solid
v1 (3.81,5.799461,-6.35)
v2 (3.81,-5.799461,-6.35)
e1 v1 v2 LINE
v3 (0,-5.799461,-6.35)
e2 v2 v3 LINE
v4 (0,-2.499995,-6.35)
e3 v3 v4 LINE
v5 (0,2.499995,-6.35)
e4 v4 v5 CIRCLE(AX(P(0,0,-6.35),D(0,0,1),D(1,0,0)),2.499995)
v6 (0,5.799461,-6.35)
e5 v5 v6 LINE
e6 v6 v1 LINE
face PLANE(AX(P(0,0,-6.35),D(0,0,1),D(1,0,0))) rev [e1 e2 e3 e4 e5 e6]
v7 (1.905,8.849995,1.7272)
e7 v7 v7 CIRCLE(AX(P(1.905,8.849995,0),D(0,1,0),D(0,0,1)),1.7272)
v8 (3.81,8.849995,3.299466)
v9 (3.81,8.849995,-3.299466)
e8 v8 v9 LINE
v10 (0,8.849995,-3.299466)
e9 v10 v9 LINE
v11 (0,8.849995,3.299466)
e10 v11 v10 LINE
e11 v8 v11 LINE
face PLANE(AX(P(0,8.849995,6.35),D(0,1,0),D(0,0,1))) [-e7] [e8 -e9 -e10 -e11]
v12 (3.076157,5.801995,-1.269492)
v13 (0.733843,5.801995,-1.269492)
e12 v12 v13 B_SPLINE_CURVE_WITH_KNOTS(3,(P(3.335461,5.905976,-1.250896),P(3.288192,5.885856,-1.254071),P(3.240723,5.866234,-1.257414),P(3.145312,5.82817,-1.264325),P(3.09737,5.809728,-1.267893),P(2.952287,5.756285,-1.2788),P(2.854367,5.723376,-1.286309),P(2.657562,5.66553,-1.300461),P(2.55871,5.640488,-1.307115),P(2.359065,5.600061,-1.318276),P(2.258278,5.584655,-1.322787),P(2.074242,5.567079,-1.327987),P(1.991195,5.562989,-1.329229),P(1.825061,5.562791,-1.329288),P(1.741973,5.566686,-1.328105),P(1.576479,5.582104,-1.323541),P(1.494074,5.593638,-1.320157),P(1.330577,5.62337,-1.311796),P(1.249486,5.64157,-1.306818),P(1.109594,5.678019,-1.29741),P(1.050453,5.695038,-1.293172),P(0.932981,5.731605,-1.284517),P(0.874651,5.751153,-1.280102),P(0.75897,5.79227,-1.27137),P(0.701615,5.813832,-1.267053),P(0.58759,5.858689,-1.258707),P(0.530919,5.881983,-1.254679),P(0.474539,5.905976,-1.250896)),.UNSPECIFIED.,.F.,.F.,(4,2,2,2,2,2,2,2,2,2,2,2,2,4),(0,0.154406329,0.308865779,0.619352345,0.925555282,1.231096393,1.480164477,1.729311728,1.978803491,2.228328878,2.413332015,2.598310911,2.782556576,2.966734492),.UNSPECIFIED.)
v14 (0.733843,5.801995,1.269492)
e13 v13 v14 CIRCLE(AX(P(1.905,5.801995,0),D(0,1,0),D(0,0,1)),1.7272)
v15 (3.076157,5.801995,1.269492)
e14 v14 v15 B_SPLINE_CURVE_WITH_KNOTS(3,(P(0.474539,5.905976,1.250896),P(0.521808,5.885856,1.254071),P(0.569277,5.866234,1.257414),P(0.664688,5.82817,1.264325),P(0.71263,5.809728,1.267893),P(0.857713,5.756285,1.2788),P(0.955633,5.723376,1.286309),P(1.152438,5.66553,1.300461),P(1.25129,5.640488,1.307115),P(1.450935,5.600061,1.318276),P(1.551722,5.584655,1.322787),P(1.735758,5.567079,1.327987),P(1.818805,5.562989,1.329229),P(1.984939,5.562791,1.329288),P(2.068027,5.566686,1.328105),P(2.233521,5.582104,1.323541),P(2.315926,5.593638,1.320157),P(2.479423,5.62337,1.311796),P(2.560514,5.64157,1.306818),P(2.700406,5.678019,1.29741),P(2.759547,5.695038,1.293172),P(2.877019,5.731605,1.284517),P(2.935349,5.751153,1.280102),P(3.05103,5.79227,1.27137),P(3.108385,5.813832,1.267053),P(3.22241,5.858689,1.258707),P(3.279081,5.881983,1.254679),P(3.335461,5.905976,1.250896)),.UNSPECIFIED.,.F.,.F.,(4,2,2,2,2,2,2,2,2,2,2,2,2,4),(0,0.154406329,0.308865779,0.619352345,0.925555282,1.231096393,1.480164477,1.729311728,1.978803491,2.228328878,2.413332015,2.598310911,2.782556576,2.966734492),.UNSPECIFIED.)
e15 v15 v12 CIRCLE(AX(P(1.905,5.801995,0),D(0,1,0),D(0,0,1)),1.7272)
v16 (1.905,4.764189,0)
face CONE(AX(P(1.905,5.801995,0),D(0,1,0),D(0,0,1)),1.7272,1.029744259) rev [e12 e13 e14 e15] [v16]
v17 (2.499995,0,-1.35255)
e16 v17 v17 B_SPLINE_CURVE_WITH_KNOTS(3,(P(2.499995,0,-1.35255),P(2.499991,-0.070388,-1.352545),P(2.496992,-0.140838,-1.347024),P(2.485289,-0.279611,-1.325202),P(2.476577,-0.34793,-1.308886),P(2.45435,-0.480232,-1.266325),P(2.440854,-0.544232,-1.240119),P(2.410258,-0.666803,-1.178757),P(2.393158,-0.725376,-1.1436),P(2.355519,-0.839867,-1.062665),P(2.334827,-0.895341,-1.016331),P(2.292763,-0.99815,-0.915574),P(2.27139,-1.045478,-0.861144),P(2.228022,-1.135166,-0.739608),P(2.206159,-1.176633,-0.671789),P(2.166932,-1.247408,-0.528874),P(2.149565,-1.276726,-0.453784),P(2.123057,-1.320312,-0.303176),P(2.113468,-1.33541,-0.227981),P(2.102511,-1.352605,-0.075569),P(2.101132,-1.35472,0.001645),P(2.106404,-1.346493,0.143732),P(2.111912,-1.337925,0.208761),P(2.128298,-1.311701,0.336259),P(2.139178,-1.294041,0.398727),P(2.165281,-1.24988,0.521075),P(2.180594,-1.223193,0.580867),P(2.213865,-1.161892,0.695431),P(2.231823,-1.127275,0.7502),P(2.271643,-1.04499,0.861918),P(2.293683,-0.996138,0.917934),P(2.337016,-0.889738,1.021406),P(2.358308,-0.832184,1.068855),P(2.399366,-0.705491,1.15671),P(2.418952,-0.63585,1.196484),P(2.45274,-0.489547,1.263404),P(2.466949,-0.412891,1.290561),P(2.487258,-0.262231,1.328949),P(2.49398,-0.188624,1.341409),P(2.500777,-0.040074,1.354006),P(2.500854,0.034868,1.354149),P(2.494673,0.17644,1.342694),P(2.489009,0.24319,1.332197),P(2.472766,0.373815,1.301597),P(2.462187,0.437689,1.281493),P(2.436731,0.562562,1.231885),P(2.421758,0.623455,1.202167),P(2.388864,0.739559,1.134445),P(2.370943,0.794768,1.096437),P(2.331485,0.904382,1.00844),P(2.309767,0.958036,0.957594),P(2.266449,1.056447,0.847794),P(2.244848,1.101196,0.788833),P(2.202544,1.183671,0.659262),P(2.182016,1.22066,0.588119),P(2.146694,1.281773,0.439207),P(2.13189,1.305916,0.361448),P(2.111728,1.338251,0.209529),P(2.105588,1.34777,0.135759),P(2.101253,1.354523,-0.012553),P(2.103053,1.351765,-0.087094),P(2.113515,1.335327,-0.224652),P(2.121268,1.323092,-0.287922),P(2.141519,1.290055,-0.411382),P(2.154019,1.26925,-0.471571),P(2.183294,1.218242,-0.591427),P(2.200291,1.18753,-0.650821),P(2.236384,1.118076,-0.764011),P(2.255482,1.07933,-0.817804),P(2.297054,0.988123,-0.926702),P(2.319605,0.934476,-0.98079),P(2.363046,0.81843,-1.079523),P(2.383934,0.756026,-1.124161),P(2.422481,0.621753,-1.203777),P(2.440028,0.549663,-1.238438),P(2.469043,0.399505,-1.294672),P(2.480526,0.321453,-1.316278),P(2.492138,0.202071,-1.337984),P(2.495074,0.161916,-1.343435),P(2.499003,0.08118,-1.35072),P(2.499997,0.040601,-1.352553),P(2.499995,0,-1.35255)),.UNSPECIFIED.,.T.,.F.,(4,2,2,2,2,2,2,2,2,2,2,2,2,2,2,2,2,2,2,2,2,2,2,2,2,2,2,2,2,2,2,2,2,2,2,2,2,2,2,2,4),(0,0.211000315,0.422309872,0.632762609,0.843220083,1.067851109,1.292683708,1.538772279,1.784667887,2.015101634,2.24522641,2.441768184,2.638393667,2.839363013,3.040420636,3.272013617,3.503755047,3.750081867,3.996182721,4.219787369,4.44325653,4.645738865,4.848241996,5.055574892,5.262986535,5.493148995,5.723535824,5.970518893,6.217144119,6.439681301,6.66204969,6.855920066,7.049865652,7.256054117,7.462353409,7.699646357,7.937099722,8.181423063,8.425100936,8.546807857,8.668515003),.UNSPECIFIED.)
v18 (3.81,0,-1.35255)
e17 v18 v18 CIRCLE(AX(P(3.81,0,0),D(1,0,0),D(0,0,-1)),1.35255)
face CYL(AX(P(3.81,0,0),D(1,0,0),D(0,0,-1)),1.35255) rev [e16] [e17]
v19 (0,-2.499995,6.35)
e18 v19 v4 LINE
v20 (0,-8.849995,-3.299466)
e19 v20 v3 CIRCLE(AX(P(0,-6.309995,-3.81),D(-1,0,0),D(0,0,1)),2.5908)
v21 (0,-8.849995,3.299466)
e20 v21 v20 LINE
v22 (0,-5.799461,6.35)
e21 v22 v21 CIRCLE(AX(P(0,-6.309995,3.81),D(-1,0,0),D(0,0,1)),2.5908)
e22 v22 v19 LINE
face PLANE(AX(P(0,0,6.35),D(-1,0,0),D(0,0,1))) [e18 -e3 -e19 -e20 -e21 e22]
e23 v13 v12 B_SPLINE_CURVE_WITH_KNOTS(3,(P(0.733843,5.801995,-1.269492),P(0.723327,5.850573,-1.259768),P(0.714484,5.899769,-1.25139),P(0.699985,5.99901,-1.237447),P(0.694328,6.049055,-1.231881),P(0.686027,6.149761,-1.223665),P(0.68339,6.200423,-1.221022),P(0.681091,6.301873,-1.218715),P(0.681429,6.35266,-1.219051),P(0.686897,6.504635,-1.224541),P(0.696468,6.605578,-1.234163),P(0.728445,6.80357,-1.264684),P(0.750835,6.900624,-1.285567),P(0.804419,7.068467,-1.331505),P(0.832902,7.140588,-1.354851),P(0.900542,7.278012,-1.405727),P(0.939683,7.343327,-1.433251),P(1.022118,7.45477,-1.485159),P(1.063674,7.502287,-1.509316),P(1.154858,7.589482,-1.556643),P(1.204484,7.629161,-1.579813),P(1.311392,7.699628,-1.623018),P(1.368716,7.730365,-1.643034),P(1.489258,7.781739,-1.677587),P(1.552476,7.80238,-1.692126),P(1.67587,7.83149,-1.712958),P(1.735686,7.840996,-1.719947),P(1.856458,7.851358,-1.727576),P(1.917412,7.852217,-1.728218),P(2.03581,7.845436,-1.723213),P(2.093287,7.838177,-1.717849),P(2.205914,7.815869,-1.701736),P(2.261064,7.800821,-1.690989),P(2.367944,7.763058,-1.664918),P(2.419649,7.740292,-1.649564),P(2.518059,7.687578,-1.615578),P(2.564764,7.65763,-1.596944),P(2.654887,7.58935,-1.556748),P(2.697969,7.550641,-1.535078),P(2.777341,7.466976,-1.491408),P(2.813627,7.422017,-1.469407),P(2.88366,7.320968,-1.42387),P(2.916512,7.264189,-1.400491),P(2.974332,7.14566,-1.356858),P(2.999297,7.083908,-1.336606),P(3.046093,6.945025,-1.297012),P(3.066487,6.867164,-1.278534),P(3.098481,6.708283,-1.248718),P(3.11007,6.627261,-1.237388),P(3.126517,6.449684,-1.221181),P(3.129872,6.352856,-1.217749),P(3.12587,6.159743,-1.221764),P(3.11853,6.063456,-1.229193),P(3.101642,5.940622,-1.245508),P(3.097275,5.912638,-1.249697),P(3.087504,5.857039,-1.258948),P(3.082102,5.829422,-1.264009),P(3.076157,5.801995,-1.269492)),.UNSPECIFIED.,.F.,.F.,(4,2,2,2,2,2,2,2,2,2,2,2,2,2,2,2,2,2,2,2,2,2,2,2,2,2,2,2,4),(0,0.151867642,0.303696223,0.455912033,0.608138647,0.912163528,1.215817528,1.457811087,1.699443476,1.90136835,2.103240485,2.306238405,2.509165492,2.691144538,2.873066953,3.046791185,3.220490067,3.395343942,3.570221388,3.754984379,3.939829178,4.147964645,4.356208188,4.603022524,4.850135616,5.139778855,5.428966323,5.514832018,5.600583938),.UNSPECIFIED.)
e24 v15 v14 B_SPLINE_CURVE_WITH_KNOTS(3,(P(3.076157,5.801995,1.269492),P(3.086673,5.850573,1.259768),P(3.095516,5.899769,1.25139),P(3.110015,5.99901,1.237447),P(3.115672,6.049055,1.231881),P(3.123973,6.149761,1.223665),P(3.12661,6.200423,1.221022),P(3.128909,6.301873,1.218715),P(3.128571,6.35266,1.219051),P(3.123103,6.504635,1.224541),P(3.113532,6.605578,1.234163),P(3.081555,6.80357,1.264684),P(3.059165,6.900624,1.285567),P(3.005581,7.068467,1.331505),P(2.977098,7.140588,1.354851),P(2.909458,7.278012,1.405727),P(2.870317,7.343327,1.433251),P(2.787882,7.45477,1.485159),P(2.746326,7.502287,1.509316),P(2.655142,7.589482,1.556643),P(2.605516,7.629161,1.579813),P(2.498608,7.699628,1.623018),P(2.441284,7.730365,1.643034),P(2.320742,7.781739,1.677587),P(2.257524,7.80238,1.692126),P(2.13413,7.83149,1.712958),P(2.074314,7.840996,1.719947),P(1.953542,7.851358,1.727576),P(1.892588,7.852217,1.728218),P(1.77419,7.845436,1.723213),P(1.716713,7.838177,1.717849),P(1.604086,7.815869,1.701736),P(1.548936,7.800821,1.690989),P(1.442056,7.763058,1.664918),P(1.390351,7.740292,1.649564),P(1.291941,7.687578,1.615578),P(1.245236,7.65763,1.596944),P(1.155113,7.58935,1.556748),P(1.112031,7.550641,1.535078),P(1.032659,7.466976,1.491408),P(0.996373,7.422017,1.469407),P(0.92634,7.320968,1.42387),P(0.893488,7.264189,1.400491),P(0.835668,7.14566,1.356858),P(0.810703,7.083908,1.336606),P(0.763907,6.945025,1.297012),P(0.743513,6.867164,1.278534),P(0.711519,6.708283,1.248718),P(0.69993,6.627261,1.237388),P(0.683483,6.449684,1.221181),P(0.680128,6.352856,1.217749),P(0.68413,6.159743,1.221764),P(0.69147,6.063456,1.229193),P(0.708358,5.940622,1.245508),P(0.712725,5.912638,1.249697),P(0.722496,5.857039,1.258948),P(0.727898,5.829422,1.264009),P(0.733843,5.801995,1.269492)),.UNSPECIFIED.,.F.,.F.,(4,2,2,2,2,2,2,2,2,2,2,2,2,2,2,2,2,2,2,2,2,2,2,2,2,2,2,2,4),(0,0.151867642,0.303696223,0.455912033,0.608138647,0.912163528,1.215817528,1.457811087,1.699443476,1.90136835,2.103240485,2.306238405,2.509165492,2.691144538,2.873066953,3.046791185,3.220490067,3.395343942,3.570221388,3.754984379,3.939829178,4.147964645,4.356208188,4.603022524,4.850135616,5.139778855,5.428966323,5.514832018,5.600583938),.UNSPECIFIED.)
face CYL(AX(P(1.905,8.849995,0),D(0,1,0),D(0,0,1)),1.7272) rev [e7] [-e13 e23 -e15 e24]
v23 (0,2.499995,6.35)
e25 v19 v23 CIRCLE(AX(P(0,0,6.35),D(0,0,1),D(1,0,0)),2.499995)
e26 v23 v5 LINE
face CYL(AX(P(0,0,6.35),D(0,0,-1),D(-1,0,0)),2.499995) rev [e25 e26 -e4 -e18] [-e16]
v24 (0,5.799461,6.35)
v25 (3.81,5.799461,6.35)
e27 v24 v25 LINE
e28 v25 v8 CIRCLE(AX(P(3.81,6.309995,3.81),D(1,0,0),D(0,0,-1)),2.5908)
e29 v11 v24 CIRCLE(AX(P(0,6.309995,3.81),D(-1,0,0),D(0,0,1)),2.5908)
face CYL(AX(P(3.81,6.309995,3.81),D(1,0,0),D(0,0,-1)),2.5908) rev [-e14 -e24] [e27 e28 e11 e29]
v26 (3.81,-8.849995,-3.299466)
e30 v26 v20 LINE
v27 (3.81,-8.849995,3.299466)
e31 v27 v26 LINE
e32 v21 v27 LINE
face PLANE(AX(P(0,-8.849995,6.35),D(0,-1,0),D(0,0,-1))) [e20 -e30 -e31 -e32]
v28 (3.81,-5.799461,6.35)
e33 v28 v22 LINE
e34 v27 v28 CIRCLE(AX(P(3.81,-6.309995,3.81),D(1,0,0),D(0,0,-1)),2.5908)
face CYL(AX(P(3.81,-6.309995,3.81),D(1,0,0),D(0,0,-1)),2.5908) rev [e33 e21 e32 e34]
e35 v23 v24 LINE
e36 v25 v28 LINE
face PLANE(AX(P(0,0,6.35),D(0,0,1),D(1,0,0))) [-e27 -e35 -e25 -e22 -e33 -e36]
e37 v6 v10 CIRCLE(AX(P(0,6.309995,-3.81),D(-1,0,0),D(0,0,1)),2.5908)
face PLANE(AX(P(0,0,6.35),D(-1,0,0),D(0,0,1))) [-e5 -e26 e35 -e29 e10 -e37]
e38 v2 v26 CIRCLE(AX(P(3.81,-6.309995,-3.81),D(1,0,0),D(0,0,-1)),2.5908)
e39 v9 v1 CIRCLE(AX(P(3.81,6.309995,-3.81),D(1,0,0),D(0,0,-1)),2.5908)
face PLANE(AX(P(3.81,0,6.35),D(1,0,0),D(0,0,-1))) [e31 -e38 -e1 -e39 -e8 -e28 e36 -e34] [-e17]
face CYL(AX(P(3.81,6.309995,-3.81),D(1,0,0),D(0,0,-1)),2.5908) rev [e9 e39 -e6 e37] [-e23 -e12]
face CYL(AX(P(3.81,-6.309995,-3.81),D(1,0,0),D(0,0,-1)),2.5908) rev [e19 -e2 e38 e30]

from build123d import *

# Parameters (mm, degrees)
BOSS_EXTRUDE1_DEPTH            = 6.35
F_8_32_TAPPED_HOLE1_D          = 3.4544
F_8_32_TAPPED_HOLE1_DEPTH      = 3.048
F_8_32_TAPPED_HOLE1_TIP        = 1.037806461
F_6_32_TAPPED_HOLE1_D          = 2.7051
F_6_32_TAPPED_HOLE1_DEPTH      = 9.398
F_6_32_TAPPED_HOLE1_TIP        = 0.81269403
F_6_0_204_DIAMETER_HOLE1_DEPTH = 3.81


# Read off the part's stored shape, not the designer's step: #6 (0.204) Diameter Hole1
with BuildPart() as part:
    # Sketch1 → Boss-Extrude1 (new, symmetric)
    with BuildSketch(Plane.XY):
        with BuildLine():
            ThreePointArc((0, -2.499995), (2.499995, 0), (0, 2.499995))
            Line((0, 2.499995), (0, 8.849995))
            Line((0, 8.849995), (3.81, 8.849995))
            Line((3.81, 8.849995), (3.81, -8.849995))
            Line((3.81, -8.849995), (0, -8.849995))
            Line((0, -8.849995), (0, -2.499995))
        make_face()
    extrude(amount=BOSS_EXTRUDE1_DEPTH, both=True)

    # #8-32 Tapped Hole1
    with Locations(Plane(origin=(0, 8.849995, 0), x_dir=(1, 0, 0), z_dir=(0, 1, 0))):
        with Locations((1.905, 0)):
            Hole(F_8_32_TAPPED_HOLE1_D / 2, depth=F_8_32_TAPPED_HOLE1_DEPTH)
            with Locations((0, 0, -(F_8_32_TAPPED_HOLE1_DEPTH + F_8_32_TAPPED_HOLE1_TIP / 2))):  # 118° drill point
                Cone(0, F_8_32_TAPPED_HOLE1_D / 2, F_8_32_TAPPED_HOLE1_TIP, mode=Mode.SUBTRACT)

    # #6-32 Tapped Hole1
    with Locations(Plane(origin=(3.81, 0, 0), x_dir=(0, 0, -1), z_dir=(1, 0, 0))):
        with Locations((0, 0)):
            Hole(F_6_32_TAPPED_HOLE1_D / 2, depth=F_6_32_TAPPED_HOLE1_DEPTH)
            with Locations((0, 0, -(F_6_32_TAPPED_HOLE1_DEPTH + F_6_32_TAPPED_HOLE1_TIP / 2))):  # 118° drill point
                Cone(0, F_6_32_TAPPED_HOLE1_D / 2, F_6_32_TAPPED_HOLE1_TIP, mode=Mode.SUBTRACT)

    # #6 (0.204) Diameter Hole1 outline → #6 (0.204) Diameter Hole1 (cut)
    with BuildSketch(Plane.YZ):
        with BuildLine():
            Line((-8.849995, 6.35), (-8.849995, 3.299466318))
            ThreePointArc((-8.849995, 3.299466318), (-4.478022751, 1.978027751), (-5.799461318, 6.35))
            Line((-5.799461318, 6.35), (-8.849995, 6.35))
        make_face()
        with BuildLine():
            ThreePointArc((-5.799461318, -6.35), (-4.478022751, -1.978027751), (-8.849995, -3.299466318))
            Line((-8.849995, -3.299466318), (-8.849995, -6.35))
            Line((-8.849995, -6.35), (-5.799461318, -6.35))
        make_face()
        with BuildLine():
            Line((8.849995, 6.35), (5.799461318, 6.35))
            ThreePointArc((5.799461318, 6.35), (4.478022751, 1.978027751), (8.849995, 3.299466318))
            Line((8.849995, 3.299466318), (8.849995, 6.35))
        make_face()
        with BuildLine():
            ThreePointArc((8.849995, -3.299466318), (4.478022751, -1.978027751), (5.799461318, -6.35))
            Line((5.799461318, -6.35), (8.849995, -6.35))
            Line((8.849995, -6.35), (8.849995, -3.299466318))
        make_face()
    extrude(amount=F_6_0_204_DIAMETER_HOLE1_DEPTH, mode=Mode.SUBTRACT)


solid = part.part
